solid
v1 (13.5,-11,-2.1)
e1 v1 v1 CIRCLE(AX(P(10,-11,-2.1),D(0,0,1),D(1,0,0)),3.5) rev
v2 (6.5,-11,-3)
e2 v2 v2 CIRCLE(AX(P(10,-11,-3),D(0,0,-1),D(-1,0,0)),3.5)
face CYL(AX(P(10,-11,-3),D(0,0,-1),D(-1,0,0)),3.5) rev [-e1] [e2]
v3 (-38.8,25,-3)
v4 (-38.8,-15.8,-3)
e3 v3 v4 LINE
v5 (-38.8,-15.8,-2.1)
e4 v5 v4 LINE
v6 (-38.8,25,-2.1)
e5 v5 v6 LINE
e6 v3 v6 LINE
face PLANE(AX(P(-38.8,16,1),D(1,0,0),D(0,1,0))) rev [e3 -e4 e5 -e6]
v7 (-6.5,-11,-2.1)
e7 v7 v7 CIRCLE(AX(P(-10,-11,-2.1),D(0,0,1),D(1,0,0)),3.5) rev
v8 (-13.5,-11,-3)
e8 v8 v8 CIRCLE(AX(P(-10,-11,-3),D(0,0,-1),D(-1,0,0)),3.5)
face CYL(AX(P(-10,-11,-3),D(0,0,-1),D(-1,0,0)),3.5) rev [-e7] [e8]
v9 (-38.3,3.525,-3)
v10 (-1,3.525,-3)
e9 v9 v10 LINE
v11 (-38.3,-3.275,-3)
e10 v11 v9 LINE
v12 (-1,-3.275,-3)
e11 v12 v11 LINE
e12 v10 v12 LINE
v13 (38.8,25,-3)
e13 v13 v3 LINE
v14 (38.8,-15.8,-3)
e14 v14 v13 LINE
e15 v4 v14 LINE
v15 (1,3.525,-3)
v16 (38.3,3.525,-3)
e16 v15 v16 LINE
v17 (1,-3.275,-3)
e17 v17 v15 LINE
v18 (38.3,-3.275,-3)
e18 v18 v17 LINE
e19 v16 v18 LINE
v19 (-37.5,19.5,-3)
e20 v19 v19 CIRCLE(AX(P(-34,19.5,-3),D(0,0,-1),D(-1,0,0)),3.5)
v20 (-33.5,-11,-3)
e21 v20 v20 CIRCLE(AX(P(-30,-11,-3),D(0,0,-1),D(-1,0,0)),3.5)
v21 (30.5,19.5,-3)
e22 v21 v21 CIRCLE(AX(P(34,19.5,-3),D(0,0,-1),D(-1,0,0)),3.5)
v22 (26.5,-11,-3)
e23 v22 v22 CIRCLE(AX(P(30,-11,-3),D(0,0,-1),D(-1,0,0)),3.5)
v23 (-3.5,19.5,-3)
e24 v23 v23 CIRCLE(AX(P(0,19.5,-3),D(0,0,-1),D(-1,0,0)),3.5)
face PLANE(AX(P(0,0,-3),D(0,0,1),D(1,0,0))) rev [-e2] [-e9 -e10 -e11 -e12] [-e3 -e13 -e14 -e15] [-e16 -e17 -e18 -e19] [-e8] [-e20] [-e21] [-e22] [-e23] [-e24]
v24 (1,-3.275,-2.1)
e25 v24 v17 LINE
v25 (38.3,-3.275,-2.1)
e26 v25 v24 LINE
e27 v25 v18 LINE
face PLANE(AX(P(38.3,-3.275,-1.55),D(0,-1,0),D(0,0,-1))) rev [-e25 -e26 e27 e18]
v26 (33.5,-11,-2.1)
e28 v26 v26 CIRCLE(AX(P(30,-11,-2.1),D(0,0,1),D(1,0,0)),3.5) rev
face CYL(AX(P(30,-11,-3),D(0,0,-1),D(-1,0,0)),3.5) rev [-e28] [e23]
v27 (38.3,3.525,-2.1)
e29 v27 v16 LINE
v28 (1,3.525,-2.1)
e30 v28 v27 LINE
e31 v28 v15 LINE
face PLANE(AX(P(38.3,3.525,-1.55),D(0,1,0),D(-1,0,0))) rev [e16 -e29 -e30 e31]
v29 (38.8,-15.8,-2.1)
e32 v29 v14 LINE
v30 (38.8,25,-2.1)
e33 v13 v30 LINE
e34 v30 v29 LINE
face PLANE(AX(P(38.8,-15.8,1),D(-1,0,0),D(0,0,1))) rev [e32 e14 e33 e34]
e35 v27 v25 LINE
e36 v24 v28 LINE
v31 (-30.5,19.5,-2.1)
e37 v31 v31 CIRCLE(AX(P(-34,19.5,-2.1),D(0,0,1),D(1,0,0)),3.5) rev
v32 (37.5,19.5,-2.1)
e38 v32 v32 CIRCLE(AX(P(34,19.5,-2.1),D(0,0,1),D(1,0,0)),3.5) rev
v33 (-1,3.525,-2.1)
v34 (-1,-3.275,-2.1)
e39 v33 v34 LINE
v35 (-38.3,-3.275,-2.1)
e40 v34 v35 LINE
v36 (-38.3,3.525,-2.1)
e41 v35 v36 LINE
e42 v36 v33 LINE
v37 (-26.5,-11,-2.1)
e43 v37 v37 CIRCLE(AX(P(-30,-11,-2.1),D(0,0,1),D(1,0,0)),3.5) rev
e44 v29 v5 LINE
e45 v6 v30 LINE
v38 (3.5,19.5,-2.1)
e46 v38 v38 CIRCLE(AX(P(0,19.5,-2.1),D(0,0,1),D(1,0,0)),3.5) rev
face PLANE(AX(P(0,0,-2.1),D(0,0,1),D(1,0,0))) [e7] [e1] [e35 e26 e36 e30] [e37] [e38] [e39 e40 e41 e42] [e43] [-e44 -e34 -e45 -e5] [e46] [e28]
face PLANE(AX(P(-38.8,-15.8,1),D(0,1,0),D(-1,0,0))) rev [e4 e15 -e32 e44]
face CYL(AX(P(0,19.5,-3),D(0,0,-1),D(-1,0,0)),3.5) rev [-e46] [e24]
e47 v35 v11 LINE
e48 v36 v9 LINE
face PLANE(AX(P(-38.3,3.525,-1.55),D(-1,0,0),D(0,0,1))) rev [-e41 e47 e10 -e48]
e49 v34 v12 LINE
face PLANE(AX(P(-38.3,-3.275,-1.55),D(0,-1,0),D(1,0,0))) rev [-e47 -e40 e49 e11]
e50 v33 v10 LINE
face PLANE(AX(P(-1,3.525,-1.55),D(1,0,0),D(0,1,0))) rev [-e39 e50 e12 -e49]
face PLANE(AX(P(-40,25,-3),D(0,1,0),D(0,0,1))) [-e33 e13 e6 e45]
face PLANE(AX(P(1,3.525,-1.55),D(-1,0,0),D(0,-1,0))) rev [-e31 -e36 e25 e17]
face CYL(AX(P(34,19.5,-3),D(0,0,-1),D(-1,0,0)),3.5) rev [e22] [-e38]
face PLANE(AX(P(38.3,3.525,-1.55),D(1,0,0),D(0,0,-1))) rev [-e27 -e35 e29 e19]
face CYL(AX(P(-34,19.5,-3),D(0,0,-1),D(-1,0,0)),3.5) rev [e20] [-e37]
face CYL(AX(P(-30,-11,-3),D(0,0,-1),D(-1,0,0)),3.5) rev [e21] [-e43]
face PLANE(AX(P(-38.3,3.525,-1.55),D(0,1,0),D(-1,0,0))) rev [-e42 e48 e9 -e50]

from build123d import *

# Parameters (mm, degrees)
SKETCH14_W                        = 80
SKETCH14_H                        = 42
SKETCH14_W_2                      = 3.75
SKETCH14_H_2                      = 3.75
BASE_WITH_CUTOUTS_DEPTH           = 3
SKETCH15_W                        = 4.3
SKETCH15_H                        = 4.8
SIPM_CUTOUTS_DEPTH                = 48.265209192
PADDLE_SUPPORT_TAPERS_DEPTH       = 2
SKETCH17_W                        = 80
SKETCH17_H                        = 25
PADDLE_SUPPORT_TOP_DEPTH          = 1
PADDLE_START                      = -4
SKETCH17_2_W                      = 80
SKETCH17_2_H                      = 25
PADDLE_SUPPORT_BOTTOM_DEPTH       = 1
PADDLE_SUPPORT_TAPER_TOP_SIZE     = 0.8
PADDLE_SUPPORT_TAPER_TOP_SIZE2    = 2.4
PADDLE_SUPPORT_TAPER_BOTTOM_SIZE  = 2.4
PADDLE_SUPPORT_TAPER_BOTTOM_SIZE2 = 0.8
SKETCH18_W                        = 4
SKETCH18_H                        = 22
SKETCH18_H_2                      = 14
BASE_THICKNESS_EXPANSION_DEPTH    = 80
BAFFLE_BASE_DEPTH                 = 2
BAFFLE_LIP_DEPTH                  = 2
BAFFLE_CHAMFER_1_2_SIZE           = 1.2
BAFFLE_CHAMFER_0_4_SIZE           = 0.4
INSERT_HOLES_PCB_D                = 3.3
INSERT_HOLES_PCB_DEPTH            = 4.2
INSERT_HOLES_PCB_CBORE_D          = 7
INSERT_HOLES_PCB_CBORE_DEPTH      = 1.4
JOINT_MOD_REACH                   = 56.854
SKETCH29_W                        = 37.3
SKETCH29_H                        = 6.8
CUT_EXTRUDE1_DEPTH                = 1.45
CHAMFER1_SIZE                     = 2
CHAMFER1_SIZE2                    = 5.494954839
SKETCH34_W                        = 81.499638764
SKETCH34_H                        = 0.25
CUT_EXTRUDE2_DEPTH                = 24
M1_6_CLEARANCE_HOLE1_D            = 1.8
SKETCH38_W                        = 104.100396554
SKETCH38_H                        = 54.802140704
CUT_EXTRUDE3_DEPTH                = 55.128573785
CUT_EXTRUDE4_DEPTH                = 0.05
SKETCH40_W                        = 1.2
SKETCH40_H                        = 9
CUT_EXTRUDE5_DEPTH                = 48.190677045
SKETCH41_W                        = 77.6
SKETCH41_H                        = 40.8
CUT_EXTRUDE6_DEPTH                = 0.5


with BuildPart() as part:
    # Sketch14 → BASE WITH CUTOUTS (new body)
    with BuildSketch(Plane.XY):
        with Locations((0, 4)):
            Rectangle(SKETCH14_W, SKETCH14_H)
        with Locations((10.45, 0)):
            Rectangle(SKETCH14_W_2, SKETCH14_H_2, mode=Mode.SUBTRACT)
        with Locations((4.15, 0)):
            Rectangle(SKETCH14_W_2, SKETCH14_H_2, mode=Mode.SUBTRACT)
        with Locations((16.75, 0)):
            Rectangle(SKETCH14_W_2, SKETCH14_H_2, mode=Mode.SUBTRACT)
        with Locations((23.05, 0)):
            Rectangle(SKETCH14_W_2, SKETCH14_H_2, mode=Mode.SUBTRACT)
        with Locations((29.35, 0)):
            Rectangle(SKETCH14_W_2, SKETCH14_H_2, mode=Mode.SUBTRACT)
        with Locations((35.65, 0)):
            Rectangle(SKETCH14_W_2, SKETCH14_H_2, mode=Mode.SUBTRACT)
        with Locations((-35.65, 0)):
            Rectangle(SKETCH14_W_2, SKETCH14_H_2, mode=Mode.SUBTRACT)
        with Locations((-29.35, 0)):
            Rectangle(SKETCH14_W_2, SKETCH14_H_2, mode=Mode.SUBTRACT)
        with Locations((-23.05, 0)):
            Rectangle(SKETCH14_W_2, SKETCH14_H_2, mode=Mode.SUBTRACT)
        with Locations((-16.75, 0)):
            Rectangle(SKETCH14_W_2, SKETCH14_H_2, mode=Mode.SUBTRACT)
        with Locations((-10.45, 0)):
            Rectangle(SKETCH14_W_2, SKETCH14_H_2, mode=Mode.SUBTRACT)
        with Locations((-4.15, 0)):
            Rectangle(SKETCH14_W_2, SKETCH14_H_2, mode=Mode.SUBTRACT)
    extrude(amount=-BASE_WITH_CUTOUTS_DEPTH)

    # Sketch15 → SIPM CUTOUTS (cut, through all)
    with BuildSketch(Plane(origin=(0, 0, -3), x_dir=(-1, 0, 0), z_dir=(0, 0, -1))):
        with Locations((-35.65, 0.125)):
            Rectangle(SKETCH15_W, SKETCH15_H)
        with Locations((-29.35, 0.125)):
            Rectangle(SKETCH15_W, SKETCH15_H)
        with Locations((-23.05, 0.125)):
            Rectangle(SKETCH15_W, SKETCH15_H)
        with Locations((-16.75, 0.125)):
            Rectangle(SKETCH15_W, SKETCH15_H)
        with Locations((-10.45, 0.125)):
            Rectangle(SKETCH15_W, SKETCH15_H)
        with Locations((-4.15, 0.125)):
            Rectangle(SKETCH15_W, SKETCH15_H)
        with Locations((4.15, 0.125)):
            Rectangle(SKETCH15_W, SKETCH15_H)
        with Locations((10.45, 0.125)):
            Rectangle(SKETCH15_W, SKETCH15_H)
        with Locations((16.75, 0.125)):
            Rectangle(SKETCH15_W, SKETCH15_H)
        with Locations((23.05, 0.125)):
            Rectangle(SKETCH15_W, SKETCH15_H)
        with Locations((29.35, 0.125)):
            Rectangle(SKETCH15_W, SKETCH15_H)
        with Locations((35.65, 0.125)):
            Rectangle(SKETCH15_W, SKETCH15_H)
    extrude(amount=-SIPM_CUTOUTS_DEPTH, mode=Mode.SUBTRACT)

    # Sketch16 → PADDLE SUPPORT - TAPERS (add, symmetric)
    with BuildSketch(Plane(origin=(0, 0, 0), x_dir=(1, 0, 0), z_dir=(0, 1, 0))):
        Polygon((40, 0), (37.691381155, 0), (40, -16.789955233), align=None)
        Polygon((0, 0), (2.308618845, 0), (0, -16.789955233), (-2.308618845, 0), align=None)
        Polygon((-40, -16.789955233), (-37.691381155, 0), (-40, 0), align=None)
    extrude(amount=PADDLE_SUPPORT_TAPERS_DEPTH, both=True)

    # Sketch17 → PADDLE SUPPORT - TOP (add)
    with BuildSketch(Plane(origin=(0, 2, 0), x_dir=(1, 0, 0), z_dir=(0, 1, 0))):
        with Locations((0, -12.5)):
            Rectangle(SKETCH17_W, SKETCH17_H)
    extrude(amount=PADDLE_SUPPORT_TOP_DEPTH)

    # Sketch17<2> → PADDLE SUPPORT - BOTTOM (add)
    with BuildSketch(Plane(origin=(0, 2, 0), x_dir=(1, 0, 0), z_dir=(0, 1, 0)).offset(PADDLE_START)):
        with Locations((0, -12.5)):
            Rectangle(SKETCH17_2_W, SKETCH17_2_H)
    extrude(amount=-PADDLE_SUPPORT_BOTTOM_DEPTH)

    # PADDLE SUPPORT - TAPER TOP
    paddle_support_taper_top_edges = [part.edges().sort_by_distance(p)[0] for p in [
        (0, 3, 25),
    ]]
    paddle_support_taper_top_side = [part.faces().sort_by_distance(p)[0] for p in [
        (0, 2.5, 25),
    ]]
    chamfer(paddle_support_taper_top_edges, length=PADDLE_SUPPORT_TAPER_TOP_SIZE, length2=PADDLE_SUPPORT_TAPER_TOP_SIZE2, reference=paddle_support_taper_top_side[0])

    # PADDLE SUPPORT - TAPER BOTTOM
    paddle_support_taper_bottom_edges = [part.edges().sort_by_distance(p)[0] for p in [
        (0, -3, 25),
    ]]
    paddle_support_taper_bottom_side = [part.faces().sort_by_distance(p)[0] for p in [
        (0, -3, 12.5),
    ]]
    chamfer(paddle_support_taper_bottom_edges, length=PADDLE_SUPPORT_TAPER_BOTTOM_SIZE, length2=PADDLE_SUPPORT_TAPER_BOTTOM_SIZE2, reference=paddle_support_taper_bottom_side[0])

    # Sketch18 → BASE - THICKNESS EXPANSION (add)
    with BuildSketch(Plane(origin=(40, 0, 0), x_dir=(0, 0, -1), z_dir=(1, 0, 0))):
        with Locations((-2, 14)):
            Rectangle(SKETCH18_W, SKETCH18_H)
        with Locations((-2, -10)):
            Rectangle(SKETCH18_W, SKETCH18_H_2)
    extrude(amount=-BASE_THICKNESS_EXPANSION_DEPTH)

    # Sketch19 → BAFFLE - BASE (cut)
    with BuildSketch(Plane(origin=(0, 0, -3), x_dir=(-1, 0, 0), z_dir=(0, 0, -1))):
        Polygon((-40, 16), (-39.2, 16), (-39.2, -16.2), (39.2, -16.2), (39.2, 16), (40, 16), (40, -17), (-40, -17), align=None)
    extrude(amount=-BAFFLE_BASE_DEPTH, mode=Mode.SUBTRACT)

    # Sketch20 → BAFFLE - LIP (cut)
    with BuildSketch(Plane(origin=(0, 0, -1), x_dir=(-1, 0, 0), z_dir=(0, 0, -1))):
        Polygon((-40, 16), (-40, -17), (40, -17), (40, 16), (38.8, 16), (38.8, -15.8), (-38.8, -15.8), (-38.8, 16), align=None)
    extrude(amount=-BAFFLE_LIP_DEPTH, mode=Mode.SUBTRACT)

    # BAFFLE - CHAMFER 1.2
    baffle_chamfer_1_2_edges = [part.edges().sort_by_distance(p)[0] for p in [
        (-40, -0.5, 1),
        (0, -17, 1),
        (40, -0.5, 1),
    ]]
    chamfer(baffle_chamfer_1_2_edges, length=BAFFLE_CHAMFER_1_2_SIZE - 0.0001)  # a hair under: the kernel refuses the full size

    # BAFFLE - CHAMFER 0.4
    baffle_chamfer_0_4_edges = [part.edges().sort_by_distance(p)[0] for p in [
        (39.2, -0.1, -1),
        (-39.2, -0.1, -1),
        (0, -16.2, -1),
    ]]
    chamfer(baffle_chamfer_0_4_edges, length=BAFFLE_CHAMFER_0_4_SIZE - 0.0001)  # a hair under: the kernel refuses the full size

    # INSERT HOLES - PCB
    with Locations(Plane(origin=(0, 0, -3), x_dir=(-1, 0, 0), z_dir=(0, 0, -1))):
        with Locations((-30, -11), (-10, -11), (10, -11), (30, -11), (-34, 19.5), (0, 19.5), (34, 19.5)):
            CounterBoreHole(INSERT_HOLES_PCB_D / 2, INSERT_HOLES_PCB_CBORE_D / 2, INSERT_HOLES_PCB_CBORE_DEPTH, depth=INSERT_HOLES_PCB_DEPTH)

    # Sketch26 → JOINT MOD (cut, up to next)
    with BuildSketch(Plane(origin=(0, 0, -3), x_dir=(-1, 0, 0), z_dir=(0, 0, -1)), mode=Mode.PRIVATE) as joint_mod_sk1:
        Polygon((-38.8, 16), (-38.8, -15.8), (38.8, -15.8), (38.8, 16), (39.2, 16), (39.2, -16.2), (-39.2, -16.2), (-39.2, 16), align=None)
    joint_mod_tool1 = extrude(joint_mod_sk1.sketch, amount=-JOINT_MOD_REACH, mode=Mode.PRIVATE) & part.part
    add(joint_mod_tool1.solids().sort_by_distance((38.884755, 0.1, -3))[0], mode=Mode.SUBTRACT)

    # Sketch29 → Cut-Extrude1 (cut)
    with BuildSketch(Plane(origin=(0, 0, -3), x_dir=(-1, 0, 0), z_dir=(0, 0, -1))):
        with Locations((-19.65, 0.125)):
            Rectangle(SKETCH29_W, SKETCH29_H)
        with Locations((19.65, 0.125)):
            Rectangle(SKETCH29_W, SKETCH29_H)
    extrude(amount=-CUT_EXTRUDE1_DEPTH, mode=Mode.SUBTRACT)

    # Chamfer1
    chamfer1_edges = [part.edges().sort_by_distance(p)[0] for p in [
        (0, 3, 4),
    ]]
    chamfer1_side = [part.faces().sort_by_distance(p)[0] for p in [
        (0, 3, 13.3),
    ]]
    chamfer(chamfer1_edges, length=CHAMFER1_SIZE, length2=CHAMFER1_SIZE2, reference=chamfer1_side[0])

    # Sketch34 → Cut-Extrude2 (cut)
    with BuildSketch(Plane.XY.offset(25)):
        Rectangle(SKETCH34_W, SKETCH34_H)
    extrude(amount=-CUT_EXTRUDE2_DEPTH, mode=Mode.SUBTRACT)

    # M1.6 Clearance Hole1 (through all)
    with Locations(Plane(origin=(0, -3, 0), x_dir=(-1, 0, 0), z_dir=(0, -1, 0))):
        with Locations((0, -8)):
            Hole(M1_6_CLEARANCE_HOLE1_D / 2)

    # Sketch38 → Cut-Extrude3 (cut, through all)
    with BuildSketch(Plane(origin=(0, 0, -1.55), x_dir=(-1, 0, 0), z_dir=(0, 0, -1))):
        Rectangle(SKETCH38_W, SKETCH38_H)
    extrude(amount=-CUT_EXTRUDE3_DEPTH, mode=Mode.SUBTRACT)

    # Sketch39 → Cut-Extrude4 (cut)
    with BuildSketch(Plane.XY.offset(-1.55)):
        Polygon((40, 25), (-40, 25), (-40, 16), (-38.8, 16), (-38.8, -15.8), (38.8, -15.8), (38.8, 16), (40, 16), align=None)
    extrude(amount=-CUT_EXTRUDE4_DEPTH, mode=Mode.SUBTRACT)

    # Sketch40 → Cut-Extrude5 (cut, through all)
    with BuildSketch(Plane.XY.offset(-1.6)):
        with Locations((-39.4, 20.5)):
            Rectangle(SKETCH40_W, SKETCH40_H)
        with Locations((39.4, 20.5)):
            Rectangle(SKETCH40_W, SKETCH40_H)
    extrude(amount=-CUT_EXTRUDE5_DEPTH, mode=Mode.SUBTRACT)

    # Sketch41 → Cut-Extrude6 (cut)
    with BuildSketch(Plane.XY.offset(-1.6)):
        with Locations((0, 4.6)):
            Rectangle(SKETCH41_W, SKETCH41_H)
    extrude(amount=-CUT_EXTRUDE6_DEPTH, mode=Mode.SUBTRACT)


solid = part.part
